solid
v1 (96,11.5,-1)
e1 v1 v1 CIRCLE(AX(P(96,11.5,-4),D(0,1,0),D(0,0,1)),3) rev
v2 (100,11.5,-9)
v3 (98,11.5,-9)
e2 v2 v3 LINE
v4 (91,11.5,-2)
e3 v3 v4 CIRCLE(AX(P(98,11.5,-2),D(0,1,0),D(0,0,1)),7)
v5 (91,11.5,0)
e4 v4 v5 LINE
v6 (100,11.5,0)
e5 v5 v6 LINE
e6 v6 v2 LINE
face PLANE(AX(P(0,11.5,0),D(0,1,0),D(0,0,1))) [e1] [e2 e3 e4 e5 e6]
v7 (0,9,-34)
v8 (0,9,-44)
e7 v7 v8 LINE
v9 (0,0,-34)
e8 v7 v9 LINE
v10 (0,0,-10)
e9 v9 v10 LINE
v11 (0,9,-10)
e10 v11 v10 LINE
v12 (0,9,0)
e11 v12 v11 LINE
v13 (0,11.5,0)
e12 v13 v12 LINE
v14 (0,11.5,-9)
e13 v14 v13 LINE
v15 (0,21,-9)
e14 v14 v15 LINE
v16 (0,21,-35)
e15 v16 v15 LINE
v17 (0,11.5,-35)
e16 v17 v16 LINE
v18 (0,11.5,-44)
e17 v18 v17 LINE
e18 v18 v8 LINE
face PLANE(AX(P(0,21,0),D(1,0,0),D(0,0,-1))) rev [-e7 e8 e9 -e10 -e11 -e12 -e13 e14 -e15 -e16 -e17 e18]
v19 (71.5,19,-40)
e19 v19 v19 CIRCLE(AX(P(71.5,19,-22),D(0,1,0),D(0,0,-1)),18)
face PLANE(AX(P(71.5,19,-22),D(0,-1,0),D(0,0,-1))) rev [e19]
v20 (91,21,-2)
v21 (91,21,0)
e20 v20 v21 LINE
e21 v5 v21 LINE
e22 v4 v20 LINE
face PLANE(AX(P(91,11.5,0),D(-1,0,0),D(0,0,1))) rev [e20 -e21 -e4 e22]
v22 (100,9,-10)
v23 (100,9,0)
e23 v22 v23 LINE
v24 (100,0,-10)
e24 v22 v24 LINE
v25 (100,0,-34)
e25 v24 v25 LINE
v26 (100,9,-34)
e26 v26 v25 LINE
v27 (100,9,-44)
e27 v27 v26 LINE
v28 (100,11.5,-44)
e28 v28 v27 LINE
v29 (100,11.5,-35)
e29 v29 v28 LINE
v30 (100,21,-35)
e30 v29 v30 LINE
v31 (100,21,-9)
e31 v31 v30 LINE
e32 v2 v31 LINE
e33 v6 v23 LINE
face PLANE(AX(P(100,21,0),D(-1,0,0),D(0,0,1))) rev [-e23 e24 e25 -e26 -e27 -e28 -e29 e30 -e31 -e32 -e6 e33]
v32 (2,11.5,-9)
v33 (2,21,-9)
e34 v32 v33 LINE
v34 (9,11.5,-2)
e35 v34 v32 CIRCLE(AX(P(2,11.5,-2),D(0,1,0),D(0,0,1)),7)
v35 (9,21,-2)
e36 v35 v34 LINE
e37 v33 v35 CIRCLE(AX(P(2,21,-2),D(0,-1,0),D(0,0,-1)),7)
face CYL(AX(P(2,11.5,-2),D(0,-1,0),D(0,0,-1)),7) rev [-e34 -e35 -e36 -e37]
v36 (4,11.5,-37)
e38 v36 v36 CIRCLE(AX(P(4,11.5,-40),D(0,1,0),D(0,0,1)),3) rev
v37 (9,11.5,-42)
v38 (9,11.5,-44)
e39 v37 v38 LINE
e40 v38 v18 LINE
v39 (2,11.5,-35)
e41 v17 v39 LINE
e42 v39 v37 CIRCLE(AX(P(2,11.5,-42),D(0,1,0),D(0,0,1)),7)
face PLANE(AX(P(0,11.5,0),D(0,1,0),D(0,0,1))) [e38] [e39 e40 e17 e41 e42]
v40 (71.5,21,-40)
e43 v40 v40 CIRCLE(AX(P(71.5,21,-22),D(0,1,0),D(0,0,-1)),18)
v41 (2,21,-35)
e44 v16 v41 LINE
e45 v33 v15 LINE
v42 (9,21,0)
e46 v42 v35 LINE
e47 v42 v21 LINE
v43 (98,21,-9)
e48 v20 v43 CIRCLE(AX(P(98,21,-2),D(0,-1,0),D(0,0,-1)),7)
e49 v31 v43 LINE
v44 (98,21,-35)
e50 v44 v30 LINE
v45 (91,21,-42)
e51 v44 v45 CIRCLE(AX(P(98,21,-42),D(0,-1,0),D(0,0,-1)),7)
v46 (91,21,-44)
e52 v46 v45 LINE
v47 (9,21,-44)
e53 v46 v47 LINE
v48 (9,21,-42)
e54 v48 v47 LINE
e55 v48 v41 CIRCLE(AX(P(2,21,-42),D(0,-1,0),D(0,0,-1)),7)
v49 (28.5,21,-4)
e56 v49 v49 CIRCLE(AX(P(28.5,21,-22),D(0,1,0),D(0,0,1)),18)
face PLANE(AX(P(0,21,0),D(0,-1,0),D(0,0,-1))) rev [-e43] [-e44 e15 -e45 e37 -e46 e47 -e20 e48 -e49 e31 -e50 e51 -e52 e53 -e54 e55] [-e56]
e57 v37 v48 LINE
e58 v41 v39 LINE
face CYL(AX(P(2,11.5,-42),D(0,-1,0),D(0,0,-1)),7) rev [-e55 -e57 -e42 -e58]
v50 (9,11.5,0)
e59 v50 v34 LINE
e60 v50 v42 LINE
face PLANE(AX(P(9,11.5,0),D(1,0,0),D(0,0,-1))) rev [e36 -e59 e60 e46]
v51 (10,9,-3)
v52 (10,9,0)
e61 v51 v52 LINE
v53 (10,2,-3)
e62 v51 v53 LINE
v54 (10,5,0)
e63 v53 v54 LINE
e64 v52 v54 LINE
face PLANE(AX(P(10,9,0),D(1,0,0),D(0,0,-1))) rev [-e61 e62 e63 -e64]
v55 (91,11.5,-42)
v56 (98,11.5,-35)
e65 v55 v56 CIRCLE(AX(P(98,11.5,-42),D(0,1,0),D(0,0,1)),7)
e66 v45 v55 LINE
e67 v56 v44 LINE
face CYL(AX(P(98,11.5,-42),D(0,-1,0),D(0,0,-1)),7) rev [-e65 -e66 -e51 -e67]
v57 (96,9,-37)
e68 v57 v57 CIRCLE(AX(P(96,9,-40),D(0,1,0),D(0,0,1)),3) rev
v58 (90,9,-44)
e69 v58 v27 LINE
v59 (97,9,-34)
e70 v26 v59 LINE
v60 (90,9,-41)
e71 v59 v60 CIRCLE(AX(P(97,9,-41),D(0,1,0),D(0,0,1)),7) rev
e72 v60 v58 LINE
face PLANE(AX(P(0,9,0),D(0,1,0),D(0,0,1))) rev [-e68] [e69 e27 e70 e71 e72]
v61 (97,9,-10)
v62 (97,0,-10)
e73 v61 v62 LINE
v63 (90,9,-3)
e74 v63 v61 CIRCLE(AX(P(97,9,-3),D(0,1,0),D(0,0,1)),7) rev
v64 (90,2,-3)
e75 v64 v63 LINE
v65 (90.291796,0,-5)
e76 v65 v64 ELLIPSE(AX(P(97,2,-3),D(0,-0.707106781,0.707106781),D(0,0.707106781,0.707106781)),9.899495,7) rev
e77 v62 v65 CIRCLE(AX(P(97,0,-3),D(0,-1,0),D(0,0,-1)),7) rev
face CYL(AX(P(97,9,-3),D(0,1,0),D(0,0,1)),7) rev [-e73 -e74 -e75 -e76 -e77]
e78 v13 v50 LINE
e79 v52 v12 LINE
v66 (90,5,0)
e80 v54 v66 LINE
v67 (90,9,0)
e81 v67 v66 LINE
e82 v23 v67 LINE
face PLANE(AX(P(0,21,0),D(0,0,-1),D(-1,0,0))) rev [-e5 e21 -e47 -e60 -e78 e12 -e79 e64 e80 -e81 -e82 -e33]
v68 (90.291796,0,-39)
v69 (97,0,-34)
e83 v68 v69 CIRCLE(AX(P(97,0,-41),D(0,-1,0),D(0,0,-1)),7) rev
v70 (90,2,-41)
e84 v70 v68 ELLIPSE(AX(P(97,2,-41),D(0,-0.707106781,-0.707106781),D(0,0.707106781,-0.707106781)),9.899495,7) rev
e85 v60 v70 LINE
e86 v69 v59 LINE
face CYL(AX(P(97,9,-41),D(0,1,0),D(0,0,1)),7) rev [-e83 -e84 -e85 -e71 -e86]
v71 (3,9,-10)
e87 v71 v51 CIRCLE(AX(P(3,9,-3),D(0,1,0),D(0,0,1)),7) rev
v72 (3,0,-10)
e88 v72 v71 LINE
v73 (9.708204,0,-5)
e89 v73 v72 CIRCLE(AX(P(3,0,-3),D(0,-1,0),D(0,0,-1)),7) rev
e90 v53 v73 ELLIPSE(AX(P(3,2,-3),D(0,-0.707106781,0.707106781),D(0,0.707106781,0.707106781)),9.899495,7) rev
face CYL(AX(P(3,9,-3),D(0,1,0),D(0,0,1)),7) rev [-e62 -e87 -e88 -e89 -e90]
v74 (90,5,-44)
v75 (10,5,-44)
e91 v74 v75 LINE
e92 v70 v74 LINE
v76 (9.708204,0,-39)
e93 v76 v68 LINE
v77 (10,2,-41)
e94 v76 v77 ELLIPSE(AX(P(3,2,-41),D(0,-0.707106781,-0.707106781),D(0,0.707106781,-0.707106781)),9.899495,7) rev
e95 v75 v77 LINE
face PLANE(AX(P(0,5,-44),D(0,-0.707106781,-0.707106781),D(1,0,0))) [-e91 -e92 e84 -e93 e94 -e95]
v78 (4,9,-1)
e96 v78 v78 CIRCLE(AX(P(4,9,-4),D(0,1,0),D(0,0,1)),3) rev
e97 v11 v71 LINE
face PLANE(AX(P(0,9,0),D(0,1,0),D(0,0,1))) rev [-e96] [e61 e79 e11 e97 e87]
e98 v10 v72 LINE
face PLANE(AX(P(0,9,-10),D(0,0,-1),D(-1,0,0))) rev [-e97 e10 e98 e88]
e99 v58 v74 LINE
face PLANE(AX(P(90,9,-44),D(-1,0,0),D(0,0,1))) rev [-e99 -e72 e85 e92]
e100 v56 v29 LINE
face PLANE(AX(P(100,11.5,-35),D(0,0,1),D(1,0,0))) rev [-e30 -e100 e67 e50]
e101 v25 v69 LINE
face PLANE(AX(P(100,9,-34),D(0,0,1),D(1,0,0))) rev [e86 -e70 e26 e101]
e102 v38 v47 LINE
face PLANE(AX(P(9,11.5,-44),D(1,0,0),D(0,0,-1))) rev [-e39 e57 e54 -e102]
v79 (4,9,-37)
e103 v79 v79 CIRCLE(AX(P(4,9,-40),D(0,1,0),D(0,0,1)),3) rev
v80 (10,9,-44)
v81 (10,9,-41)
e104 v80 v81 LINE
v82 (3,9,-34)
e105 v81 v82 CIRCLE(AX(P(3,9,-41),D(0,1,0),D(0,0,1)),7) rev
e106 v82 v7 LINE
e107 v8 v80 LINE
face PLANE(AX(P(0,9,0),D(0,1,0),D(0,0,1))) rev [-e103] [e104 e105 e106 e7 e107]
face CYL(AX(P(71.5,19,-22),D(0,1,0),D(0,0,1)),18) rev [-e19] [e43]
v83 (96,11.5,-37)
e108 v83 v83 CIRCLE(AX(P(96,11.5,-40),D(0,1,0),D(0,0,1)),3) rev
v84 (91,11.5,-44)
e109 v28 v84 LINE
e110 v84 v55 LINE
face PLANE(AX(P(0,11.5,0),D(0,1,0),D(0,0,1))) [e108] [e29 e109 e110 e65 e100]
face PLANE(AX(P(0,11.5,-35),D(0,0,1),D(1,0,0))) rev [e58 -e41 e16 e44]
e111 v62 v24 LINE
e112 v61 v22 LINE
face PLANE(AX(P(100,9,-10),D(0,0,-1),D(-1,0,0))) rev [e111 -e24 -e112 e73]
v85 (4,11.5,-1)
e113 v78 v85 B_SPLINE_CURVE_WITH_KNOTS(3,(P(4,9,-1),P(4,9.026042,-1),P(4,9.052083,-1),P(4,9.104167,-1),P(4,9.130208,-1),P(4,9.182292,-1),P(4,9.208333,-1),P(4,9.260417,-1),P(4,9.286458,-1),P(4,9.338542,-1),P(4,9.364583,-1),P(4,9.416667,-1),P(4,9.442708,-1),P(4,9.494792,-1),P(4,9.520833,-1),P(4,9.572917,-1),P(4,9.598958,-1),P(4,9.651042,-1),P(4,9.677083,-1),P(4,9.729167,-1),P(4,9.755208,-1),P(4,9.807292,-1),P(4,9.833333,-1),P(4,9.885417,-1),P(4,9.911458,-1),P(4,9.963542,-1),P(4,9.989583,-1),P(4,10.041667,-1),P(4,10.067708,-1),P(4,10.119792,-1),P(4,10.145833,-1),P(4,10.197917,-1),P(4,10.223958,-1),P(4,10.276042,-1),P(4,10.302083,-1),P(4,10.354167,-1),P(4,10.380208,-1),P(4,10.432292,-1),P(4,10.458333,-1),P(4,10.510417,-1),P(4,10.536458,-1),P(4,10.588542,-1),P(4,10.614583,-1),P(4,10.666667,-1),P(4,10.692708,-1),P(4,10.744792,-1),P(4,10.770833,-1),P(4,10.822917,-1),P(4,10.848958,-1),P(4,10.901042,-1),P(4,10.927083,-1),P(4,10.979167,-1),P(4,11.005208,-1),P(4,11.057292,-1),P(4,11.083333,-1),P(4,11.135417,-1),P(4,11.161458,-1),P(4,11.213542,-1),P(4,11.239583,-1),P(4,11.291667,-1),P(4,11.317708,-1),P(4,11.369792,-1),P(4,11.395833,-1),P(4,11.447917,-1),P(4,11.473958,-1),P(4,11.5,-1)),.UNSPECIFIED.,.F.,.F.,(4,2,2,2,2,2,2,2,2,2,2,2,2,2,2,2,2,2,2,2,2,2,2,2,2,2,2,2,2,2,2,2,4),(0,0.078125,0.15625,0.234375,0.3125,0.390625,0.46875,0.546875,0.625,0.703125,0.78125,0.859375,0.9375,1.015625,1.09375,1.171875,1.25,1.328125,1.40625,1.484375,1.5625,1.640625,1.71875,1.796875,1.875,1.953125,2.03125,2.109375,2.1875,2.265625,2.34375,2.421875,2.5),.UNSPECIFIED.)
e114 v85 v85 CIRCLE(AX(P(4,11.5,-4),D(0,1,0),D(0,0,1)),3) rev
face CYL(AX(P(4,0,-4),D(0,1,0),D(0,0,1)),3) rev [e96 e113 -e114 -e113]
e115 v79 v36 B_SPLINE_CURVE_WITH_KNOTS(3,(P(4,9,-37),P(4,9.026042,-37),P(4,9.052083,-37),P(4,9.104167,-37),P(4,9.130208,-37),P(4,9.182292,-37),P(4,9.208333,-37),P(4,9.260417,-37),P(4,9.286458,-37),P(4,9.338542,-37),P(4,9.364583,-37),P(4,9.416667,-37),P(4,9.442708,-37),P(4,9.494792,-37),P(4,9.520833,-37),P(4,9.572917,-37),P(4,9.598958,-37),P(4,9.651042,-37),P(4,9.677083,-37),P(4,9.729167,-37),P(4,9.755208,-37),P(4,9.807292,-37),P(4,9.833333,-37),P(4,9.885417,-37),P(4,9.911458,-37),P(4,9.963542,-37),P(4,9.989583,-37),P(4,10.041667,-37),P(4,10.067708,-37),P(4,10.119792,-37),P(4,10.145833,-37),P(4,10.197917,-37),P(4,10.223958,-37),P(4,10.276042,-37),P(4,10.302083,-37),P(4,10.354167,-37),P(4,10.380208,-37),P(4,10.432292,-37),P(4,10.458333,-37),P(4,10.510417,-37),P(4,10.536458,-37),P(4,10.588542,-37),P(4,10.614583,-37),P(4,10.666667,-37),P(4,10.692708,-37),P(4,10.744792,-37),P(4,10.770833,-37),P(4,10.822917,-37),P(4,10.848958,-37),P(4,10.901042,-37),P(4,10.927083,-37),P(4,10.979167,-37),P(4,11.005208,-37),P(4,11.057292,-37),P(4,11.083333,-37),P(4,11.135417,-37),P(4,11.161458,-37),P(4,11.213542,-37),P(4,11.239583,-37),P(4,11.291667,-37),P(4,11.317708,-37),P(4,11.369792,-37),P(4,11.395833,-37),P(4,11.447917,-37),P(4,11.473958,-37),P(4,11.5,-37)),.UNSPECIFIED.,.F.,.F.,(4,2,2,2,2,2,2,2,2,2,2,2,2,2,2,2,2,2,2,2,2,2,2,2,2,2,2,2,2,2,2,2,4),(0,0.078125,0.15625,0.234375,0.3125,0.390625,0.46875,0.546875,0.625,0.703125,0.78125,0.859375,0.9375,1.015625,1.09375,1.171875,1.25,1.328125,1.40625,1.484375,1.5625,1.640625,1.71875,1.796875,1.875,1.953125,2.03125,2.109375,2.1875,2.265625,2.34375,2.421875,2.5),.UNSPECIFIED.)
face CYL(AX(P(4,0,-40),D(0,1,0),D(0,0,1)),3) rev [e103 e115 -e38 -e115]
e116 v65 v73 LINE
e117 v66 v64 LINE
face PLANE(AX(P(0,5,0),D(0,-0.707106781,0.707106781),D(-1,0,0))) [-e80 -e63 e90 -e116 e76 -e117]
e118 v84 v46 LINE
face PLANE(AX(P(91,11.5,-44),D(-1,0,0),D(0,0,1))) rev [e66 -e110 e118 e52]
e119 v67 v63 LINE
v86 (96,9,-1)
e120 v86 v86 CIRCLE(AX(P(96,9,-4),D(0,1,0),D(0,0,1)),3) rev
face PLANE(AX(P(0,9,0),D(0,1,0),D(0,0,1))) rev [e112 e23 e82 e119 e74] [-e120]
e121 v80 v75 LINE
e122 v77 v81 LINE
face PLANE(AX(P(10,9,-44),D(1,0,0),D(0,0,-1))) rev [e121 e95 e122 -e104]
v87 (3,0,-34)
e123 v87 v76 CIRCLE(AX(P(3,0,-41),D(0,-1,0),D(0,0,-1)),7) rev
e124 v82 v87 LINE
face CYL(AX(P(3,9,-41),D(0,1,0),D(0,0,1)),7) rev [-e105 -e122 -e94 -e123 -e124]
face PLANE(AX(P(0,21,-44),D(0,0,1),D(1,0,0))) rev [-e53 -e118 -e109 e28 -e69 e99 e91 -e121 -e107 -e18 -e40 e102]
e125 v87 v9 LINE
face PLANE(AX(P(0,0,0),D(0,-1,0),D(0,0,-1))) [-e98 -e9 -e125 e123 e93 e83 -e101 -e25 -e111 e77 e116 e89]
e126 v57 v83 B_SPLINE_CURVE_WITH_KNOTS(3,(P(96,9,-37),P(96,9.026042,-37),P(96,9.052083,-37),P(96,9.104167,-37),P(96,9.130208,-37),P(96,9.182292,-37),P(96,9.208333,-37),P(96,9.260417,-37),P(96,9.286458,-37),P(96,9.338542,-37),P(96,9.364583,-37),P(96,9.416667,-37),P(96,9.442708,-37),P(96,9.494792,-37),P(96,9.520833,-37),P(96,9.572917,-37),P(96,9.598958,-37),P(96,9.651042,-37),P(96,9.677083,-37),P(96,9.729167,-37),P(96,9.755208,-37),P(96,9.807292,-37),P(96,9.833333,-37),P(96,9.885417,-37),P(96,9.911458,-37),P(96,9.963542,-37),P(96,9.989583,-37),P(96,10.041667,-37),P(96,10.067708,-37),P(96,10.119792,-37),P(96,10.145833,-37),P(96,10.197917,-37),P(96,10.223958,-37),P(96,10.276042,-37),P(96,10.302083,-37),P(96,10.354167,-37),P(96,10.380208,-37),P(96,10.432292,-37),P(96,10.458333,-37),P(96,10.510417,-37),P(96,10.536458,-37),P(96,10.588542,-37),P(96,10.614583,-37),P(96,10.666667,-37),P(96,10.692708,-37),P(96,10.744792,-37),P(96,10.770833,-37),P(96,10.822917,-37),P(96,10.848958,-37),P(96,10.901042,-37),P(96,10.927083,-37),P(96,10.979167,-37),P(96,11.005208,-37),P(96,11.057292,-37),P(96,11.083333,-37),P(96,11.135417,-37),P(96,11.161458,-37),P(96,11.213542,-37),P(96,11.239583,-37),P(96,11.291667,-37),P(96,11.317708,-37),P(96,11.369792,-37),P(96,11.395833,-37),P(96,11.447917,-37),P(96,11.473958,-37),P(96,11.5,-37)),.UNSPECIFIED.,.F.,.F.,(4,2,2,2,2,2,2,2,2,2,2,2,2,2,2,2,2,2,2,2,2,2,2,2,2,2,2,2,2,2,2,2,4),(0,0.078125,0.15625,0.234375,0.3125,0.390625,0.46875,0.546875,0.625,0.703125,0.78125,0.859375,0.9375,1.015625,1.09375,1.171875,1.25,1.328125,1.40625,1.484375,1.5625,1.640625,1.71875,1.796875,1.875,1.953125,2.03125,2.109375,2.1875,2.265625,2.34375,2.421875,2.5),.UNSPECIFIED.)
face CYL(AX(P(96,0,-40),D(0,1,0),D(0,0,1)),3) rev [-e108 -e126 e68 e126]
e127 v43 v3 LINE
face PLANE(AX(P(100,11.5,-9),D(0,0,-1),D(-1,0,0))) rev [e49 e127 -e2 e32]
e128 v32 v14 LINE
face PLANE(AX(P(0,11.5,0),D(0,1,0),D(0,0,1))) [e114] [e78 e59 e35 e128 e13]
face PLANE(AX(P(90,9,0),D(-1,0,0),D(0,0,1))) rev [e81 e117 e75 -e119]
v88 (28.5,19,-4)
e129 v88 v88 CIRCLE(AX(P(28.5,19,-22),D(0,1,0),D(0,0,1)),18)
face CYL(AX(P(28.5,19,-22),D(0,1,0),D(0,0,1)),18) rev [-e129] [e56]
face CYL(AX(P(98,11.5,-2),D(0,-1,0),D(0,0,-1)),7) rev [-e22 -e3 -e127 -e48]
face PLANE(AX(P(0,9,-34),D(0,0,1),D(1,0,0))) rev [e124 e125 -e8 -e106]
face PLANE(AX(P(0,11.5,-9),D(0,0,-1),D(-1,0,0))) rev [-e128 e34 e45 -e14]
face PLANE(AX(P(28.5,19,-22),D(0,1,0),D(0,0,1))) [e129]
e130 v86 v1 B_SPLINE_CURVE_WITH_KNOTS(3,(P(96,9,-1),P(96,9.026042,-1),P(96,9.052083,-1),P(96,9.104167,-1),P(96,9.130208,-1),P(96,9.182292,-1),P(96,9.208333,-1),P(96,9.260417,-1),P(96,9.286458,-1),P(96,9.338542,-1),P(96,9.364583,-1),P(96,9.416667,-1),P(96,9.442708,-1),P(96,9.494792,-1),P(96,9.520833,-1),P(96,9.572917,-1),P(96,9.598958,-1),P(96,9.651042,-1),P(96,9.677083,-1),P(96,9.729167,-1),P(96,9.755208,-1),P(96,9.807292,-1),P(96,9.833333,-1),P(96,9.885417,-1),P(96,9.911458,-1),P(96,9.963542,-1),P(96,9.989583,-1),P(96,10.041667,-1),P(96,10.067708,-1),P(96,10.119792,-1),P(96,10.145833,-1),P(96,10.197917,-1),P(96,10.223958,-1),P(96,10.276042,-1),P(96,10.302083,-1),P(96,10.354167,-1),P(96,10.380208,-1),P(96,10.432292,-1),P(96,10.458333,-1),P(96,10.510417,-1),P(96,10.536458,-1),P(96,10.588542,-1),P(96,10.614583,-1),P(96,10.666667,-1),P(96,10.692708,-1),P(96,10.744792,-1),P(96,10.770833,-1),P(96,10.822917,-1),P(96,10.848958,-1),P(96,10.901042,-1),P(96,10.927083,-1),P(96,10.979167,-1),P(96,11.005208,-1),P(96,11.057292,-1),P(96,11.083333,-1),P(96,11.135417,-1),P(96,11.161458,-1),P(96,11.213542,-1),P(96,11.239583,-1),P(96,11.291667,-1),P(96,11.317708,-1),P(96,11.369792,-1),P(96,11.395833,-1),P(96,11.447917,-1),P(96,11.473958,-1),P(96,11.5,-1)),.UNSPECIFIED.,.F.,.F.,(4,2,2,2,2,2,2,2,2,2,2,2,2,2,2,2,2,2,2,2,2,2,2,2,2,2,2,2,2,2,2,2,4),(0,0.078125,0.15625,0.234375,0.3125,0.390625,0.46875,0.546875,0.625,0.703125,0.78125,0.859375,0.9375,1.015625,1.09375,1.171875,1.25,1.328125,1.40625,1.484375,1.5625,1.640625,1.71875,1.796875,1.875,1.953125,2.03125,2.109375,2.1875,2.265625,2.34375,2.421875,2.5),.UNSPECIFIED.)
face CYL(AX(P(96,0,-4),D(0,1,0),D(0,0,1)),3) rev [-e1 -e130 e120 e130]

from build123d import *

# Parameters (mm, degrees)
SKETCH_1_W          = 100
SKETCH_1_H          = 44
EXTRUDE_1_DEPTH     = 21
CHAMFER_1_SIZE      = 5
SKETCH_2_R          = 3
CUT_EXTRUDE_1_DEPTH = 112.251966275
SKETCH_3_W          = 9
SKETCH_3_H          = 9
CUT_EXTRUDE_2_DEPTH = 9.5
SKETCH_4_R          = 18
CUT_EXTRUDE_3_DEPTH = 2
SKETCH_5_W          = 10
SKETCH_5_H          = 10
CUT_EXTRUDE_4_DEPTH = 9
FILLET_1_R          = 7


with BuildPart() as part:
    # 草图1 → 凸台-拉伸1 (new body)
    with BuildSketch(Plane(origin=(0, 0, 0), x_dir=(1, 0, 0), z_dir=(0, 1, 0))):
        with Locations((50, 22)):
            Rectangle(SKETCH_1_W, SKETCH_1_H)
    extrude(amount=EXTRUDE_1_DEPTH)

    # 倒角1
    chamfer_1_edges = [part.edges().sort_by_distance(p)[0] for p in [
        (50, 0, -44),
        (50, 0, 0),
    ]]
    chamfer(chamfer_1_edges, length=CHAMFER_1_SIZE)

    # 草图2 → 切除-拉伸1 (cut, through all)
    with BuildSketch(Plane(origin=(0, 21, 0), x_dir=(1, 0, 0), z_dir=(0, 1, 0))):
        with Locations(Location((96, 4, 0), (0, 0, 270))):
            Circle(SKETCH_2_R)
        with Locations(Location((4, 4, 0), (0, 0, 160.528779366))):
            Circle(SKETCH_2_R)
        with Locations(Location((4, 40, 0), (0, 0, 270))):
            Circle(SKETCH_2_R)
        with Locations(Location((96, 40, 0), (0, 0, 199.471220634))):
            Circle(SKETCH_2_R)
    extrude(amount=-CUT_EXTRUDE_1_DEPTH, mode=Mode.SUBTRACT)

    # 草图3 → 切除-拉伸2 (cut)
    with BuildSketch(Plane(origin=(0, 21, 0), x_dir=(1, 0, 0), z_dir=(0, 1, 0))):
        with Locations((95.5, 4.5)):
            Rectangle(SKETCH_3_W, SKETCH_3_H)
        with Locations((4.5, 4.5)):
            Rectangle(SKETCH_3_W, SKETCH_3_H)
        with Locations((95.5, 39.5)):
            Rectangle(SKETCH_3_W, SKETCH_3_H)
        with Locations((4.5, 39.5)):
            Rectangle(SKETCH_3_W, SKETCH_3_H)
    extrude(amount=-CUT_EXTRUDE_2_DEPTH, mode=Mode.SUBTRACT)

    # 草图4 → 切除-拉伸3 (cut)
    with BuildSketch(Plane(origin=(0, 21, 0), x_dir=(1, 0, 0), z_dir=(0, 1, 0))):
        with Locations(Location((28.5, 22, 0), (0, 0, 270))):
            Circle(SKETCH_4_R)
        with Locations(Location((71.5, 22, 0), (0, 0, 90))):
            Circle(SKETCH_4_R)
    extrude(amount=-CUT_EXTRUDE_3_DEPTH, mode=Mode.SUBTRACT)

    # 草图5 → 切除-拉伸4 (cut)
    with BuildSketch(Plane.XZ):
        with Locations((95, -39)):
            Rectangle(SKETCH_5_W, SKETCH_5_H)
        with Locations((95, -5)):
            Rectangle(SKETCH_5_W, SKETCH_5_H)
        with Locations((5, -5)):
            Rectangle(SKETCH_5_W, SKETCH_5_H)
        with Locations((5, -39)):
            Rectangle(SKETCH_5_W, SKETCH_5_H)
    extrude(amount=-CUT_EXTRUDE_4_DEPTH, mode=Mode.SUBTRACT)

    # 圆角1
    # the kernel refuses this fillet: 7 mm, written as the material it adds along each edge
    with BuildSketch(Plane(origin=(9, 21, -35), x_dir=(-1, 0, 0), z_dir=(0, -1, 0))) as fillet_1_piece_1:
        with BuildLine():
            CenterArc((FILLET_1_R, FILLET_1_R), FILLET_1_R, 180, 90)
            Line((0, FILLET_1_R), (0, 0))
            Line((0, 0), (FILLET_1_R, 0))
        make_face()
    extrude(amount=9.5)
    with BuildSketch(Plane(origin=(9, 21, -9), x_dir=(0, 0, 1), z_dir=(0, -1, 0))) as fillet_1_piece_2_section:
        with BuildLine():
            CenterArc((FILLET_1_R, FILLET_1_R), FILLET_1_R, 180, 90)
            Line((0, FILLET_1_R), (0, 0))
            Line((0, 0), (FILLET_1_R, 0))
        make_face()
    fillet_1_piece_2 = extrude(amount=27, mode=Mode.PRIVATE)
    fillet_1_piece_2 = split(fillet_1_piece_2, bisect_by=Plane(origin=(7.436424427, 9, -7.436424427), z_dir=(0, 1, 0)), keep=Keep.TOP, mode=Mode.PRIVATE)
    add(fillet_1_piece_2)
    with BuildSketch(Plane(origin=(10, 0, -10), x_dir=(0, 0, 1), z_dir=(0, 1, 0))) as fillet_1_piece_3_section:
        with BuildLine():
            CenterArc((FILLET_1_R, -FILLET_1_R), FILLET_1_R, 90, 90)
            Line((0, -FILLET_1_R), (0, 0))
            Line((0, 0), (FILLET_1_R, 0))
        make_face()
    fillet_1_piece_3 = extrude(amount=26.5, mode=Mode.PRIVATE)
    fillet_1_piece_3 = split(fillet_1_piece_3, bisect_by=Plane(origin=(9.565673238, 1.191688147, -3.808311853), z_dir=(0, 0.7071067811865476, -0.7071067811865476)), keep=Keep.TOP, mode=Mode.PRIVATE)
    fillet_1_piece_3 = split(fillet_1_piece_3, bisect_by=Plane(origin=(9.565673238, 21, -7.128953399), z_dir=(0, -1, 0)), keep=Keep.TOP, mode=Mode.PRIVATE)
    add(fillet_1_piece_3)
    with BuildSketch(Plane(origin=(10, 0, -34), x_dir=(-1, 0, 0), z_dir=(0, 1, 0))) as fillet_1_piece_4_section:
        with BuildLine():
            CenterArc((FILLET_1_R, -FILLET_1_R), FILLET_1_R, 90, 90)
            Line((0, -FILLET_1_R), (0, 0))
            Line((0, 0), (FILLET_1_R, 0))
        make_face()
    fillet_1_piece_4 = extrude(amount=26.5, mode=Mode.PRIVATE)
    fillet_1_piece_4 = split(fillet_1_piece_4, bisect_by=Plane(origin=(7.120179523, 21, -34.433198562), z_dir=(0, -1, 0)), keep=Keep.TOP, mode=Mode.PRIVATE)
    fillet_1_piece_4 = split(fillet_1_piece_4, bisect_by=Plane(origin=(7.120179523, -0.033400719, -38.966599281), z_dir=(0, 0.7071067811865476, 0.7071067811865476)), keep=Keep.TOP, mode=Mode.PRIVATE)
    add(fillet_1_piece_4)
    with BuildSketch(Plane(origin=(91, 21, -35), x_dir=(1, 0, 0), z_dir=(0, -1, 0)), Plane(origin=(91, 21, -9), x_dir=(0, 0, 1), z_dir=(0, -1, 0))) as fillet_1_piece_5:
        with BuildLine():
            CenterArc((FILLET_1_R, -FILLET_1_R), FILLET_1_R, 90, 90)
            Line((0, -FILLET_1_R), (0, 0))
            Line((0, 0), (FILLET_1_R, 0))
        make_face()
    extrude(amount=9.5)
    with BuildSketch(Plane(origin=(90, 0, -34), x_dir=(1, 0, 0), z_dir=(0, 1, 0))) as fillet_1_piece_6_section:
        with BuildLine():
            CenterArc((FILLET_1_R, FILLET_1_R), FILLET_1_R, 180, 90)
            Line((0, FILLET_1_R), (0, 0))
            Line((0, 0), (FILLET_1_R, 0))
        make_face()
    fillet_1_piece_6 = extrude(amount=26.5, mode=Mode.PRIVATE)
    fillet_1_piece_6 = split(fillet_1_piece_6, bisect_by=Plane(origin=(92.879820477, 21, -34.433198562), z_dir=(0, -1, 0)), keep=Keep.TOP, mode=Mode.PRIVATE)
    fillet_1_piece_6 = split(fillet_1_piece_6, bisect_by=Plane(origin=(92.879820477, -0.033400719, -38.966599281), z_dir=(0, 0.7071067811865476, 0.7071067811865476)), keep=Keep.TOP, mode=Mode.PRIVATE)
    add(fillet_1_piece_6)
    with BuildSketch(Plane(origin=(90, 0, -10), x_dir=(0, 0, 1), z_dir=(0, 1, 0))) as fillet_1_piece_7_section:
        with BuildLine():
            CenterArc((FILLET_1_R, FILLET_1_R), FILLET_1_R, 180, 90)
            Line((0, FILLET_1_R), (0, 0))
            Line((0, 0), (FILLET_1_R, 0))
        make_face()
    fillet_1_piece_7 = extrude(amount=26.5, mode=Mode.PRIVATE)
    fillet_1_piece_7 = split(fillet_1_piece_7, bisect_by=Plane(origin=(90.434326762, 1.191688147, -3.808311853), z_dir=(0, 0.7071067811865476, -0.7071067811865476)), keep=Keep.TOP, mode=Mode.PRIVATE)
    fillet_1_piece_7 = split(fillet_1_piece_7, bisect_by=Plane(origin=(90.434326762, 21, -7.128953399), z_dir=(0, -1, 0)), keep=Keep.TOP, mode=Mode.PRIVATE)
    add(fillet_1_piece_7)


solid = part.part
